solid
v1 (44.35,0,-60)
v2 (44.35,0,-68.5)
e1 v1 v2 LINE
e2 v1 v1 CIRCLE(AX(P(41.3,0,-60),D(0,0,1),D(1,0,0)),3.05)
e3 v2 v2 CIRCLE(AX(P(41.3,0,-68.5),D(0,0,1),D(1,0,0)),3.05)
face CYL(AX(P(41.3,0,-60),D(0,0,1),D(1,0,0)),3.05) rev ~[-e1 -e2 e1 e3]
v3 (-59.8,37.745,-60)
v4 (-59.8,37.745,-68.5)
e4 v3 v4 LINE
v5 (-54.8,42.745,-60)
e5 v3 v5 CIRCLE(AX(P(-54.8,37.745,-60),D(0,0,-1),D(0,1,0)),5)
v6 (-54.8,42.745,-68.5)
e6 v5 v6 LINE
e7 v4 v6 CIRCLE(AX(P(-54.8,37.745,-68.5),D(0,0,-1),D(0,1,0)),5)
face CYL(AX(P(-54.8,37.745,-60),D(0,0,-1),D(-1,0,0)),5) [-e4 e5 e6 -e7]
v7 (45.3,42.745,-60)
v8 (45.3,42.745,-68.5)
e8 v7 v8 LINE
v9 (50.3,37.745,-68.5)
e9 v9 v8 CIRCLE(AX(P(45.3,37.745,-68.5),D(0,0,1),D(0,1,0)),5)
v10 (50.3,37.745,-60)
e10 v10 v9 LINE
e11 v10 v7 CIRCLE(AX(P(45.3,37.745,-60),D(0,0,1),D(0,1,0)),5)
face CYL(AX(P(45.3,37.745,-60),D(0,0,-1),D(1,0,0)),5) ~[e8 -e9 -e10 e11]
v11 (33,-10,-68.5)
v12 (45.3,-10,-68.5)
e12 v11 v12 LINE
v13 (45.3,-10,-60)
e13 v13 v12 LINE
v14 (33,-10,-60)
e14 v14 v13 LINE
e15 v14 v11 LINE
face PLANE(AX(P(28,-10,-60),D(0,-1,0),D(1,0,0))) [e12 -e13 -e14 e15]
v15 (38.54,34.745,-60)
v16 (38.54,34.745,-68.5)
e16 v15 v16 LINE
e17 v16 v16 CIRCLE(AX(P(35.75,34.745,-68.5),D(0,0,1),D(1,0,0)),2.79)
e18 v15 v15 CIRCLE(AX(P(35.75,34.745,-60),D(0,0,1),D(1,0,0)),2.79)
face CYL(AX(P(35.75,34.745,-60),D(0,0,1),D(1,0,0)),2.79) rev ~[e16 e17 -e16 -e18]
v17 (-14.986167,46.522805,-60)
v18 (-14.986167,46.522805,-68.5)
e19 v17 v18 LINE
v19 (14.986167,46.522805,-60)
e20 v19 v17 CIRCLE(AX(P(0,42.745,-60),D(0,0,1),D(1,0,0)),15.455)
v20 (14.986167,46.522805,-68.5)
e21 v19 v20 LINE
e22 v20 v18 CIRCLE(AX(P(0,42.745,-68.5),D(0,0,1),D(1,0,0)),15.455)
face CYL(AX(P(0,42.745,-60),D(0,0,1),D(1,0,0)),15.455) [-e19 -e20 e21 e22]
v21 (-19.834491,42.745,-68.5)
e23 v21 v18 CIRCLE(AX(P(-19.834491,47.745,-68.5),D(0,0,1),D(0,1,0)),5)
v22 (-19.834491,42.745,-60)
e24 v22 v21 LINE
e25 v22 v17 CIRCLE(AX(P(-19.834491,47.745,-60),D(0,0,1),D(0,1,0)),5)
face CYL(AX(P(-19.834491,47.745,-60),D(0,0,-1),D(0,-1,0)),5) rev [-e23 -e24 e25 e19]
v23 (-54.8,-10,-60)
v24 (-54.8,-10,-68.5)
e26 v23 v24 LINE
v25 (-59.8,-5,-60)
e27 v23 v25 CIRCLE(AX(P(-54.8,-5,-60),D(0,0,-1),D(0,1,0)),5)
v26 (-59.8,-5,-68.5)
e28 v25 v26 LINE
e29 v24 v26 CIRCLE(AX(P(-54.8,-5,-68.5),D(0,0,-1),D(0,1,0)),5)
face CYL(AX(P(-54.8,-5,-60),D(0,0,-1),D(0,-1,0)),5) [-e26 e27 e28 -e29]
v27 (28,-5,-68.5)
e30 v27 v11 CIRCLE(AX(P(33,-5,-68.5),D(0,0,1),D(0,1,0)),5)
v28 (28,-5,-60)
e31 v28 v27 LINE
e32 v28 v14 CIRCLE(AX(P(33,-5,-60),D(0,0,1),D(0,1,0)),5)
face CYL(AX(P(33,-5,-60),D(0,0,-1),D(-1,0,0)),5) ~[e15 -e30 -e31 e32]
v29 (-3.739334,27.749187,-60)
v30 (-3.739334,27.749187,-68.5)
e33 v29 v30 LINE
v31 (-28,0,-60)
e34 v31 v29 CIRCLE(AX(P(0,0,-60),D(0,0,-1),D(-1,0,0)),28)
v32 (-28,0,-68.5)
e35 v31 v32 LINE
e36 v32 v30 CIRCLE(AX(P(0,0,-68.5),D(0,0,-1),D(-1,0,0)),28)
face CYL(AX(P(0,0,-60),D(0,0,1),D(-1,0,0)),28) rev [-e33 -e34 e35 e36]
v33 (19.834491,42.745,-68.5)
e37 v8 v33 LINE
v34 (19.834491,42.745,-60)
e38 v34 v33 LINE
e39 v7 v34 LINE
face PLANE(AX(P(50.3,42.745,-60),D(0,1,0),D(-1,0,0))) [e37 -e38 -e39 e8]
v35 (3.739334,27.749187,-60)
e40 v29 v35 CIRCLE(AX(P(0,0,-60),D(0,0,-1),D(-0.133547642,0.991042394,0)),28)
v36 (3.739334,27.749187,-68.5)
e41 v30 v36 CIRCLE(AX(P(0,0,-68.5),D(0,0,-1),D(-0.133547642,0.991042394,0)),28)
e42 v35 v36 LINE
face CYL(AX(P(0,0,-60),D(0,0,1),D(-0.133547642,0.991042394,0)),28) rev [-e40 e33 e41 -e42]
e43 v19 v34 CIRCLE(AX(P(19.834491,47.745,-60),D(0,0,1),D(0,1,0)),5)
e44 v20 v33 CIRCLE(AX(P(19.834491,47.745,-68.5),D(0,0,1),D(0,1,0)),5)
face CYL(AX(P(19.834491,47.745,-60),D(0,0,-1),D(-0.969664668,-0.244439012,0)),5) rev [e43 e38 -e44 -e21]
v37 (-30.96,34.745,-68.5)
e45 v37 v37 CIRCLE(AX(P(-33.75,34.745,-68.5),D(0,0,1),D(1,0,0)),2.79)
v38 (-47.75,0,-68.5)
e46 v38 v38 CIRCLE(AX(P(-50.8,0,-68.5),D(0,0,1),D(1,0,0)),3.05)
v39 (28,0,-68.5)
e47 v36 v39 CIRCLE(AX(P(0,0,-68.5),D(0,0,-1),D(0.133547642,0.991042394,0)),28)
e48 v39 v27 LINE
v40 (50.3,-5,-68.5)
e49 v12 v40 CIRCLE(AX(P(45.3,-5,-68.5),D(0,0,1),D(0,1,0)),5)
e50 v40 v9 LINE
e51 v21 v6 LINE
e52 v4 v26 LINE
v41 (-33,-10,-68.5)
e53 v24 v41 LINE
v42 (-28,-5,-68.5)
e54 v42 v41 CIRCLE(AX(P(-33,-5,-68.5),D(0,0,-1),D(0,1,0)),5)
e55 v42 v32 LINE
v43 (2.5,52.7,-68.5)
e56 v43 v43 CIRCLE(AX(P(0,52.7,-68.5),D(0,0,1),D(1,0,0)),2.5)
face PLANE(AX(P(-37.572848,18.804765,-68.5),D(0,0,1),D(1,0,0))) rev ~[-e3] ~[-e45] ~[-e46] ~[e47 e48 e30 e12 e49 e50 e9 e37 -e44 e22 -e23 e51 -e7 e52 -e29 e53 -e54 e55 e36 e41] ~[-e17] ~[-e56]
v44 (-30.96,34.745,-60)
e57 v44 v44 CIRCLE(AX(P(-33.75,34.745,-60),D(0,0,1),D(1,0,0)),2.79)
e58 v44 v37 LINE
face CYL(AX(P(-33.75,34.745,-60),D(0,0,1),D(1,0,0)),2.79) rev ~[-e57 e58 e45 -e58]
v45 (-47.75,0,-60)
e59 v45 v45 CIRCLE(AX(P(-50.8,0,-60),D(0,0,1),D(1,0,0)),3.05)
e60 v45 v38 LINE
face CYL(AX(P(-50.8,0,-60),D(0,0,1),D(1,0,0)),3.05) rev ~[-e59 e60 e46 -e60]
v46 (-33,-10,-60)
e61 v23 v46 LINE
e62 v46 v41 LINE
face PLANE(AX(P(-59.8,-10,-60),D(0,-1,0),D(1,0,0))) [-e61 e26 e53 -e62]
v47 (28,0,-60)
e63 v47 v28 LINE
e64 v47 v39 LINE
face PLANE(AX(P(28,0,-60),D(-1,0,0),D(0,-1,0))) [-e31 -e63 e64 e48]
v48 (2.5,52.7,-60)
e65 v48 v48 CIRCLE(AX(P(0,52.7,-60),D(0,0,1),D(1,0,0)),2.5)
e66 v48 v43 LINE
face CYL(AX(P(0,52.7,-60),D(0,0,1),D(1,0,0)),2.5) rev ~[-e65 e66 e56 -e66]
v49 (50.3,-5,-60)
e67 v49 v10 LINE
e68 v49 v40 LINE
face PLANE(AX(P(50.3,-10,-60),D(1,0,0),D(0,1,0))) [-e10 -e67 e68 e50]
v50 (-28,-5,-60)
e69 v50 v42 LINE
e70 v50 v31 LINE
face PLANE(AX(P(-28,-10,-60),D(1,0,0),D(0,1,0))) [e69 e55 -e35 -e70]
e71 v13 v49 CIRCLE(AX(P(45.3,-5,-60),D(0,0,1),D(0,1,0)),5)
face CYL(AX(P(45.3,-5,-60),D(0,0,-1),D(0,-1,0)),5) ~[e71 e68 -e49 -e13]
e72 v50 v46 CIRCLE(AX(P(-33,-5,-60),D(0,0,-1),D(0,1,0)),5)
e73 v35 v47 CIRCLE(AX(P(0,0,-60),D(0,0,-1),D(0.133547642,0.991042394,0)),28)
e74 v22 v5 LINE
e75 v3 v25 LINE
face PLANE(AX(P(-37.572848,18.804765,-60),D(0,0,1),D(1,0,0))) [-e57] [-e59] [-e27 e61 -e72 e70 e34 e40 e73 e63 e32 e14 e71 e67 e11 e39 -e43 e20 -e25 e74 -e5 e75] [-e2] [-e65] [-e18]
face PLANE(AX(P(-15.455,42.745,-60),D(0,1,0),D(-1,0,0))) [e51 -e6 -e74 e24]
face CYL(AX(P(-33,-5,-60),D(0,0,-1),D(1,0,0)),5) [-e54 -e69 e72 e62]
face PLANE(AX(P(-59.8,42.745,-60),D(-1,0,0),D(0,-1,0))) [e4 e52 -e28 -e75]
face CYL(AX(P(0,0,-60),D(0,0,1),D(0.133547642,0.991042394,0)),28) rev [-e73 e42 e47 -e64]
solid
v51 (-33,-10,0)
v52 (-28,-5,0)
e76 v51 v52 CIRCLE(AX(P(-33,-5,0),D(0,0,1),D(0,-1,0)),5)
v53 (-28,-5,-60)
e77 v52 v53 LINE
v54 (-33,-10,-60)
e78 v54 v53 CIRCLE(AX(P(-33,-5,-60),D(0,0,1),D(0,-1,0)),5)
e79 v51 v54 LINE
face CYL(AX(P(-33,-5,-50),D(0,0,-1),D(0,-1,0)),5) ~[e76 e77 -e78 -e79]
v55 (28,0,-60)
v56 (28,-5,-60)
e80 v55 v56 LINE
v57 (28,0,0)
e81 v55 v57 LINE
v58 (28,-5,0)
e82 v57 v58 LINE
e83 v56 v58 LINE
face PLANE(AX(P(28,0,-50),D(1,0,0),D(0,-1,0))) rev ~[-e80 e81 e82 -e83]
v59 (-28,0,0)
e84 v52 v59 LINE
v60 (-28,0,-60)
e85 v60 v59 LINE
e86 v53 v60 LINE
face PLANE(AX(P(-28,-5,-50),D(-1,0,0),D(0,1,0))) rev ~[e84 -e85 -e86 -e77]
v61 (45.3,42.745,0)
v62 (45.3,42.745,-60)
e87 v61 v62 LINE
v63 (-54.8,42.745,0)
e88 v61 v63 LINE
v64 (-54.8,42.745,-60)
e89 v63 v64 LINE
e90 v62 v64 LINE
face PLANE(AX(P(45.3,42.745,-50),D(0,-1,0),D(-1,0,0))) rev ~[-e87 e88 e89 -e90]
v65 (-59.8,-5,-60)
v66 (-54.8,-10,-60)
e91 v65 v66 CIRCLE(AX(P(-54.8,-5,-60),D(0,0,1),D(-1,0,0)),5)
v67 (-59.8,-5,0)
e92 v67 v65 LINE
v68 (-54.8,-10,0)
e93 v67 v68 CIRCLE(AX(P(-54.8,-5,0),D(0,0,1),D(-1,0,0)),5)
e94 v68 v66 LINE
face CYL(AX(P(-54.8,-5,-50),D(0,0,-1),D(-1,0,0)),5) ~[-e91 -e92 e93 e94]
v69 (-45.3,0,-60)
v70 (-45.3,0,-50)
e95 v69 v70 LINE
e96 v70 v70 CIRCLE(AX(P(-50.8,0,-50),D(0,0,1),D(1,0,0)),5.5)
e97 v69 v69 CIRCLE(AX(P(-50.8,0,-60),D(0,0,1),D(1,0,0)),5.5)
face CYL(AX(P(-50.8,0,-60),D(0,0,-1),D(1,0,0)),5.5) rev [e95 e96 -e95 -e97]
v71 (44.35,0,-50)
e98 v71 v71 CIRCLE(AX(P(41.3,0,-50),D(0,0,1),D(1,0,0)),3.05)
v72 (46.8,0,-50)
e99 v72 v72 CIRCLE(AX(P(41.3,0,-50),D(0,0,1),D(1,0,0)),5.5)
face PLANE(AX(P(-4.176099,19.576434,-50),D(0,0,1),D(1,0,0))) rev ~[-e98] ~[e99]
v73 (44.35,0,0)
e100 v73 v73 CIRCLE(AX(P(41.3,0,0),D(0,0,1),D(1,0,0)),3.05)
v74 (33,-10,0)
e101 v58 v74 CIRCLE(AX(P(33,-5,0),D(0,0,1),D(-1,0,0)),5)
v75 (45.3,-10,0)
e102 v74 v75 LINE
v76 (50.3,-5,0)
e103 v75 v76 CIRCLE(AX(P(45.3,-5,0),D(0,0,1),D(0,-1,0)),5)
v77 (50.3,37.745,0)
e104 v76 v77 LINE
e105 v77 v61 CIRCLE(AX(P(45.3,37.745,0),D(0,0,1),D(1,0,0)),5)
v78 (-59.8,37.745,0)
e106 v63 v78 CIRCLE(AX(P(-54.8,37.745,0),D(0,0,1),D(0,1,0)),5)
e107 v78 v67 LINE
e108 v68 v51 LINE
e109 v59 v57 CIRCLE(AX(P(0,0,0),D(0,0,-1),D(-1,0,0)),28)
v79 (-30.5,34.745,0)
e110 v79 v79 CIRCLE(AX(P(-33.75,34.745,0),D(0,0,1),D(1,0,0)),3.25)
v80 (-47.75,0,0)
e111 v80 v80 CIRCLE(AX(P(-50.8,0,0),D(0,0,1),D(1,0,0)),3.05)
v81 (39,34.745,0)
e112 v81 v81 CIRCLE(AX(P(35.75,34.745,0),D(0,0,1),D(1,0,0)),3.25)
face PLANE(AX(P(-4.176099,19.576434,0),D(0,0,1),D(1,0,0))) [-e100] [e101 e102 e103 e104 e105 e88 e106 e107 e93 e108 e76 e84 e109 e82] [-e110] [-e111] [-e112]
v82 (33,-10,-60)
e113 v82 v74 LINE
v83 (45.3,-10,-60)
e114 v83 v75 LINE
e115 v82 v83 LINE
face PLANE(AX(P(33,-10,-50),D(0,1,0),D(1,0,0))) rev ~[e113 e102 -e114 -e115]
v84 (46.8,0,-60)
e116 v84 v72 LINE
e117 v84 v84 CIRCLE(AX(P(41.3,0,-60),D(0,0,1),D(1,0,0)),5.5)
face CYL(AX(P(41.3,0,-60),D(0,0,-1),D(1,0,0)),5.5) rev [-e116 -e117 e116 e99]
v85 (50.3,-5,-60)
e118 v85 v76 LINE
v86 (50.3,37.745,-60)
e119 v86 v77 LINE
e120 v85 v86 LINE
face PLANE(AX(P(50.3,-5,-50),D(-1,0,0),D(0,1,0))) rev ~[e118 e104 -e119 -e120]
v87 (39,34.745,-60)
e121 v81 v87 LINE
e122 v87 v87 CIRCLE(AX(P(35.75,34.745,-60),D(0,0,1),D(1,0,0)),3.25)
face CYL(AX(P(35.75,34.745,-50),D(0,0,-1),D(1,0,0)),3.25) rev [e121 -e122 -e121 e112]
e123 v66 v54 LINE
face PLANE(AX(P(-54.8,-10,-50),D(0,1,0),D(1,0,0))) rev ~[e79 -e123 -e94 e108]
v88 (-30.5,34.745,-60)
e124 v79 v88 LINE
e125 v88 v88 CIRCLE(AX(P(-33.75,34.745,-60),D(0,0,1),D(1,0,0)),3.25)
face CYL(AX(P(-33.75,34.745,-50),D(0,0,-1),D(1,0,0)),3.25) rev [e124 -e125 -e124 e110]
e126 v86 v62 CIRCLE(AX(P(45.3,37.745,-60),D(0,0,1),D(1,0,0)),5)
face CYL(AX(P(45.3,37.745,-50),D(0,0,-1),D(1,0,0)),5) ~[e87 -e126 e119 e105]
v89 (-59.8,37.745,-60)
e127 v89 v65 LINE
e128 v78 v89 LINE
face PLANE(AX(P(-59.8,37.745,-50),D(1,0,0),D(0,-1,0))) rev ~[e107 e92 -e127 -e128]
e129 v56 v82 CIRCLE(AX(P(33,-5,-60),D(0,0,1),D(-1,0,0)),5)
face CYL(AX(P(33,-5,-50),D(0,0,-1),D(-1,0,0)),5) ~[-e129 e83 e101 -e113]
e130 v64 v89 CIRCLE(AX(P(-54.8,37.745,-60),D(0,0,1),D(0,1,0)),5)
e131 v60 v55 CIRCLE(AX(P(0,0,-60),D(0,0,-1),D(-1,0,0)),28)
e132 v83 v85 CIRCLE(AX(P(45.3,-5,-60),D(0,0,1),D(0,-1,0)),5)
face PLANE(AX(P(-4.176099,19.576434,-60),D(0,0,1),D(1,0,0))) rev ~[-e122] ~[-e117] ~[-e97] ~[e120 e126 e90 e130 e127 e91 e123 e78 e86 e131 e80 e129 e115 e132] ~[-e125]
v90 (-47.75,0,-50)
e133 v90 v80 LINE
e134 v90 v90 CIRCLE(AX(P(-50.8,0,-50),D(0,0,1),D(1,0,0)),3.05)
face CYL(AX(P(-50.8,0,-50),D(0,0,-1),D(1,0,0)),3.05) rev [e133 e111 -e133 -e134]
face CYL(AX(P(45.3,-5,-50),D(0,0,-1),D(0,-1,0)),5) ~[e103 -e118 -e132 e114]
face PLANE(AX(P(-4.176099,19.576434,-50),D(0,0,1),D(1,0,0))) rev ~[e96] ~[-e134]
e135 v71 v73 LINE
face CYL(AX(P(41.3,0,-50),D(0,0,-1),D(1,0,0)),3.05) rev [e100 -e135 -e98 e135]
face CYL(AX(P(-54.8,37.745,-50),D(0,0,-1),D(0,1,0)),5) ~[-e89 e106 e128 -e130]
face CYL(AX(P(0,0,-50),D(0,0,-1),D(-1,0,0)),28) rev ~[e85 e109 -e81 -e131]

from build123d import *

# Parameters (mm, degrees)
F2_R     = 5.5
F2_R_2   = 3.25
F2_R_3   = 2.5
F2_R_4   = 3.05
F2_R_5   = 2.79
F3_DEPTH = 8.5
F4_R     = 5
F5_R     = 5.5
F5_R_2   = 3.25
F6_DEPTH = 10
F7_R     = 5.5
F7_R_2   = 3.25
F7_R_3   = 3.05
F8_DEPTH = 50


# Not quite as in the source:
# - a feature names something its author has since deleted; it is built from what else it names


with BuildPart() as f3:
    # F2 (on offset) → F3 (new body)
    with BuildSketch(Plane.XY.offset(-60)):
        with BuildLine():
            ThreePointArc((-3.739333985, 27.7491870394), (-12.178842961, 33.2301269514), (-15.455, 42.745))
            Line((-15.455, 42.745), (-59.8, 42.745))
            Line((-59.8, 42.745), (-59.8, -10))
            Line((-59.8, -10), (-28, -10))
            Line((-28, -10), (-28, 0))
            ThreePointArc((-28, 0), (-21.0796270316, 18.429577429), (-3.739333985, 27.7491870394))
        make_face()
        with Locations((-50.8, 0)):
            Circle(F2_R, mode=Mode.SUBTRACT)
        with Locations((-33.75, 34.745)):
            Circle(F2_R_2, mode=Mode.SUBTRACT)
        with BuildLine():
            Line((50.3, 42.745), (15.455, 42.745))
            ThreePointArc((15.455, 42.745), (12.178842961, 33.2301269514), (3.739333985, 27.7491870394))
            ThreePointArc((3.739333985, 27.7491870394), (21.0796270316, 18.429577429), (28, 0))
            Line((28, 0), (28, -10))
            Line((28, -10), (50.3, -10))
            Line((50.3, -10), (50.3, 42.745))
        make_face()
        with Locations((41.3, 0)):
            Circle(F2_R, mode=Mode.SUBTRACT)
        with Locations((35.75, 34.745)):
            Circle(F2_R_2, mode=Mode.SUBTRACT)
        with BuildLine():
            Line((-15.455, 42.745), (15.455, 42.745))
            ThreePointArc((15.455, 42.745), (0, 58.2), (-15.455, 42.745))
        make_face()
        with Locations((0, 52.7)):
            Circle(F2_R_3, mode=Mode.SUBTRACT)
        with BuildLine():
            ThreePointArc((3.739333985, 27.7491870394), (12.178842961, 33.2301269514), (15.455, 42.745))
            Line((15.455, 42.745), (-15.455, 42.745))
            ThreePointArc((-15.455, 42.745), (-12.178842961, 33.2301269514), (-3.739333985, 27.7491870394))
            ThreePointArc((-3.739333985, 27.7491870394), (0, 28), (3.739333985, 27.7491870394))
        make_face()
        with Locations((-50.8, 0)):
            Circle(F2_R)
        with Locations((-50.8, 0)):
            Circle(F2_R_4, mode=Mode.SUBTRACT)
        with Locations((41.3, 0)):
            Circle(F2_R)
        with Locations((41.3, 0)):
            Circle(F2_R_4, mode=Mode.SUBTRACT)
        with Locations((-33.75, 34.745)):
            Circle(F2_R_2)
        with Locations((-33.75, 34.745)):
            Circle(F2_R_5, mode=Mode.SUBTRACT)
        with Locations((35.75, 34.745)):
            Circle(F2_R_2)
        with Locations((35.75, 34.745)):
            Circle(F2_R_5, mode=Mode.SUBTRACT)
    extrude(amount=-F3_DEPTH)

    # F4
    f4_edges = [f3.edges().sort_by_distance(p)[0] for p in [
        (-28, -10, -64.25),
        (28, -10, -64.25),
        (-15.455, 42.745, -64.25),
        (-59.8, 42.745, -64.25),
        (-59.8, -10, -64.25),
        (50.3, -10, -64.25),
        (50.3, 42.745, -64.25),
        (15.455, 42.745, -64.25),
    ]]
    fillet(f4_edges, radius=F4_R)


with BuildPart() as f6:
    # F5 (on face) → F6 (new body)
    with BuildSketch(Plane.XY.offset(-60)):
        with BuildLine():
            ThreePointArc((-28, 0), (0, 28), (28, 0))
            Line((28, 0), (28, -5))
            ThreePointArc((28, -5), (29.4644660941, -8.5355339059), (33, -10))
            Line((33, -10), (45.3, -10))
            ThreePointArc((45.3, -10), (48.8355339059, -8.5355339059), (50.3, -5))
            Line((50.3, -5), (50.3, 37.745))
            ThreePointArc((50.3, 37.745), (48.8355339059, 41.2805339059), (45.3, 42.745))
            Line((45.3, 42.745), (29.041634566, 42.745))
            Line((29.041634566, 42.745), (19.8344907926, 42.745))
            Line((19.8344907926, 42.745), (-19.8344907926, 42.745))
            Line((-19.8344907926, 42.745), (-25.041634566, 42.745))
            Line((-25.041634566, 42.745), (-54.8, 42.745))
            ThreePointArc((-54.8, 42.745), (-58.3355339059, 41.2805339059), (-59.8, 37.745))
            Line((-59.8, 37.745), (-59.8, -5))
            ThreePointArc((-59.8, -5), (-58.3355339059, -8.5355339059), (-54.8, -10))
            Line((-54.8, -10), (-33, -10))
            ThreePointArc((-33, -10), (-29.4644660941, -8.5355339059), (-28, -5))
            Line((-28, -5), (-28, 0))
        make_face()
        with Locations((-50.8, 0)):
            Circle(F5_R, mode=Mode.SUBTRACT)
        with Locations((41.3, 0)):
            Circle(F5_R, mode=Mode.SUBTRACT)
        with Locations((-33.75, 34.745)):
            Circle(F5_R_2, mode=Mode.SUBTRACT)
        with Locations((35.75, 34.745)):
            Circle(F5_R_2, mode=Mode.SUBTRACT)
    extrude(amount=F6_DEPTH)

    # F7 (on face) → F8 (join)
    with BuildSketch(Plane.XY.offset(-50)):
        with BuildLine():
            Line((-28, -5), (-28, 0))
            ThreePointArc((-28, 0), (0, 28), (28, 0))
            Line((28, 0), (28, -5))
            ThreePointArc((28, -5), (29.4644660941, -8.5355339059), (33, -10))
            Line((33, -10), (45.3, -10))
            ThreePointArc((45.3, -10), (48.8355339059, -8.5355339059), (50.3, -5))
            Line((50.3, -5), (50.3, 37.745))
            ThreePointArc((50.3, 37.745), (48.8355339059, 41.2805339059), (45.3, 42.745))
            Line((45.3, 42.745), (-54.8, 42.745))
            ThreePointArc((-54.8, 42.745), (-58.3355339059, 41.2805339059), (-59.8, 37.745))
            Line((-59.8, 37.745), (-59.8, -5))
            ThreePointArc((-59.8, -5), (-58.3355339059, -8.5355339059), (-54.8, -10))
            Line((-54.8, -10), (-33, -10))
            ThreePointArc((-33, -10), (-29.4644660941, -8.5355339059), (-28, -5))
        make_face()
        with Locations((-50.8, 0)):
            Circle(F7_R, mode=Mode.SUBTRACT)
        with Locations((41.3, 0)):
            Circle(F7_R, mode=Mode.SUBTRACT)
        with Locations((-33.75, 34.745)):
            Circle(F7_R_2, mode=Mode.SUBTRACT)
        with Locations((35.75, 34.745)):
            Circle(F7_R_2, mode=Mode.SUBTRACT)
        with Locations((-50.8, 0)):
            Circle(F7_R)
        with Locations((-50.8, 0)):
            Circle(F7_R_3, mode=Mode.SUBTRACT)
        with Locations((41.3, 0)):
            Circle(F7_R)
        with Locations((41.3, 0)):
            Circle(F7_R_3, mode=Mode.SUBTRACT)
    extrude(amount=F8_DEPTH)


solid = Compound([f3.part, f6.part])
